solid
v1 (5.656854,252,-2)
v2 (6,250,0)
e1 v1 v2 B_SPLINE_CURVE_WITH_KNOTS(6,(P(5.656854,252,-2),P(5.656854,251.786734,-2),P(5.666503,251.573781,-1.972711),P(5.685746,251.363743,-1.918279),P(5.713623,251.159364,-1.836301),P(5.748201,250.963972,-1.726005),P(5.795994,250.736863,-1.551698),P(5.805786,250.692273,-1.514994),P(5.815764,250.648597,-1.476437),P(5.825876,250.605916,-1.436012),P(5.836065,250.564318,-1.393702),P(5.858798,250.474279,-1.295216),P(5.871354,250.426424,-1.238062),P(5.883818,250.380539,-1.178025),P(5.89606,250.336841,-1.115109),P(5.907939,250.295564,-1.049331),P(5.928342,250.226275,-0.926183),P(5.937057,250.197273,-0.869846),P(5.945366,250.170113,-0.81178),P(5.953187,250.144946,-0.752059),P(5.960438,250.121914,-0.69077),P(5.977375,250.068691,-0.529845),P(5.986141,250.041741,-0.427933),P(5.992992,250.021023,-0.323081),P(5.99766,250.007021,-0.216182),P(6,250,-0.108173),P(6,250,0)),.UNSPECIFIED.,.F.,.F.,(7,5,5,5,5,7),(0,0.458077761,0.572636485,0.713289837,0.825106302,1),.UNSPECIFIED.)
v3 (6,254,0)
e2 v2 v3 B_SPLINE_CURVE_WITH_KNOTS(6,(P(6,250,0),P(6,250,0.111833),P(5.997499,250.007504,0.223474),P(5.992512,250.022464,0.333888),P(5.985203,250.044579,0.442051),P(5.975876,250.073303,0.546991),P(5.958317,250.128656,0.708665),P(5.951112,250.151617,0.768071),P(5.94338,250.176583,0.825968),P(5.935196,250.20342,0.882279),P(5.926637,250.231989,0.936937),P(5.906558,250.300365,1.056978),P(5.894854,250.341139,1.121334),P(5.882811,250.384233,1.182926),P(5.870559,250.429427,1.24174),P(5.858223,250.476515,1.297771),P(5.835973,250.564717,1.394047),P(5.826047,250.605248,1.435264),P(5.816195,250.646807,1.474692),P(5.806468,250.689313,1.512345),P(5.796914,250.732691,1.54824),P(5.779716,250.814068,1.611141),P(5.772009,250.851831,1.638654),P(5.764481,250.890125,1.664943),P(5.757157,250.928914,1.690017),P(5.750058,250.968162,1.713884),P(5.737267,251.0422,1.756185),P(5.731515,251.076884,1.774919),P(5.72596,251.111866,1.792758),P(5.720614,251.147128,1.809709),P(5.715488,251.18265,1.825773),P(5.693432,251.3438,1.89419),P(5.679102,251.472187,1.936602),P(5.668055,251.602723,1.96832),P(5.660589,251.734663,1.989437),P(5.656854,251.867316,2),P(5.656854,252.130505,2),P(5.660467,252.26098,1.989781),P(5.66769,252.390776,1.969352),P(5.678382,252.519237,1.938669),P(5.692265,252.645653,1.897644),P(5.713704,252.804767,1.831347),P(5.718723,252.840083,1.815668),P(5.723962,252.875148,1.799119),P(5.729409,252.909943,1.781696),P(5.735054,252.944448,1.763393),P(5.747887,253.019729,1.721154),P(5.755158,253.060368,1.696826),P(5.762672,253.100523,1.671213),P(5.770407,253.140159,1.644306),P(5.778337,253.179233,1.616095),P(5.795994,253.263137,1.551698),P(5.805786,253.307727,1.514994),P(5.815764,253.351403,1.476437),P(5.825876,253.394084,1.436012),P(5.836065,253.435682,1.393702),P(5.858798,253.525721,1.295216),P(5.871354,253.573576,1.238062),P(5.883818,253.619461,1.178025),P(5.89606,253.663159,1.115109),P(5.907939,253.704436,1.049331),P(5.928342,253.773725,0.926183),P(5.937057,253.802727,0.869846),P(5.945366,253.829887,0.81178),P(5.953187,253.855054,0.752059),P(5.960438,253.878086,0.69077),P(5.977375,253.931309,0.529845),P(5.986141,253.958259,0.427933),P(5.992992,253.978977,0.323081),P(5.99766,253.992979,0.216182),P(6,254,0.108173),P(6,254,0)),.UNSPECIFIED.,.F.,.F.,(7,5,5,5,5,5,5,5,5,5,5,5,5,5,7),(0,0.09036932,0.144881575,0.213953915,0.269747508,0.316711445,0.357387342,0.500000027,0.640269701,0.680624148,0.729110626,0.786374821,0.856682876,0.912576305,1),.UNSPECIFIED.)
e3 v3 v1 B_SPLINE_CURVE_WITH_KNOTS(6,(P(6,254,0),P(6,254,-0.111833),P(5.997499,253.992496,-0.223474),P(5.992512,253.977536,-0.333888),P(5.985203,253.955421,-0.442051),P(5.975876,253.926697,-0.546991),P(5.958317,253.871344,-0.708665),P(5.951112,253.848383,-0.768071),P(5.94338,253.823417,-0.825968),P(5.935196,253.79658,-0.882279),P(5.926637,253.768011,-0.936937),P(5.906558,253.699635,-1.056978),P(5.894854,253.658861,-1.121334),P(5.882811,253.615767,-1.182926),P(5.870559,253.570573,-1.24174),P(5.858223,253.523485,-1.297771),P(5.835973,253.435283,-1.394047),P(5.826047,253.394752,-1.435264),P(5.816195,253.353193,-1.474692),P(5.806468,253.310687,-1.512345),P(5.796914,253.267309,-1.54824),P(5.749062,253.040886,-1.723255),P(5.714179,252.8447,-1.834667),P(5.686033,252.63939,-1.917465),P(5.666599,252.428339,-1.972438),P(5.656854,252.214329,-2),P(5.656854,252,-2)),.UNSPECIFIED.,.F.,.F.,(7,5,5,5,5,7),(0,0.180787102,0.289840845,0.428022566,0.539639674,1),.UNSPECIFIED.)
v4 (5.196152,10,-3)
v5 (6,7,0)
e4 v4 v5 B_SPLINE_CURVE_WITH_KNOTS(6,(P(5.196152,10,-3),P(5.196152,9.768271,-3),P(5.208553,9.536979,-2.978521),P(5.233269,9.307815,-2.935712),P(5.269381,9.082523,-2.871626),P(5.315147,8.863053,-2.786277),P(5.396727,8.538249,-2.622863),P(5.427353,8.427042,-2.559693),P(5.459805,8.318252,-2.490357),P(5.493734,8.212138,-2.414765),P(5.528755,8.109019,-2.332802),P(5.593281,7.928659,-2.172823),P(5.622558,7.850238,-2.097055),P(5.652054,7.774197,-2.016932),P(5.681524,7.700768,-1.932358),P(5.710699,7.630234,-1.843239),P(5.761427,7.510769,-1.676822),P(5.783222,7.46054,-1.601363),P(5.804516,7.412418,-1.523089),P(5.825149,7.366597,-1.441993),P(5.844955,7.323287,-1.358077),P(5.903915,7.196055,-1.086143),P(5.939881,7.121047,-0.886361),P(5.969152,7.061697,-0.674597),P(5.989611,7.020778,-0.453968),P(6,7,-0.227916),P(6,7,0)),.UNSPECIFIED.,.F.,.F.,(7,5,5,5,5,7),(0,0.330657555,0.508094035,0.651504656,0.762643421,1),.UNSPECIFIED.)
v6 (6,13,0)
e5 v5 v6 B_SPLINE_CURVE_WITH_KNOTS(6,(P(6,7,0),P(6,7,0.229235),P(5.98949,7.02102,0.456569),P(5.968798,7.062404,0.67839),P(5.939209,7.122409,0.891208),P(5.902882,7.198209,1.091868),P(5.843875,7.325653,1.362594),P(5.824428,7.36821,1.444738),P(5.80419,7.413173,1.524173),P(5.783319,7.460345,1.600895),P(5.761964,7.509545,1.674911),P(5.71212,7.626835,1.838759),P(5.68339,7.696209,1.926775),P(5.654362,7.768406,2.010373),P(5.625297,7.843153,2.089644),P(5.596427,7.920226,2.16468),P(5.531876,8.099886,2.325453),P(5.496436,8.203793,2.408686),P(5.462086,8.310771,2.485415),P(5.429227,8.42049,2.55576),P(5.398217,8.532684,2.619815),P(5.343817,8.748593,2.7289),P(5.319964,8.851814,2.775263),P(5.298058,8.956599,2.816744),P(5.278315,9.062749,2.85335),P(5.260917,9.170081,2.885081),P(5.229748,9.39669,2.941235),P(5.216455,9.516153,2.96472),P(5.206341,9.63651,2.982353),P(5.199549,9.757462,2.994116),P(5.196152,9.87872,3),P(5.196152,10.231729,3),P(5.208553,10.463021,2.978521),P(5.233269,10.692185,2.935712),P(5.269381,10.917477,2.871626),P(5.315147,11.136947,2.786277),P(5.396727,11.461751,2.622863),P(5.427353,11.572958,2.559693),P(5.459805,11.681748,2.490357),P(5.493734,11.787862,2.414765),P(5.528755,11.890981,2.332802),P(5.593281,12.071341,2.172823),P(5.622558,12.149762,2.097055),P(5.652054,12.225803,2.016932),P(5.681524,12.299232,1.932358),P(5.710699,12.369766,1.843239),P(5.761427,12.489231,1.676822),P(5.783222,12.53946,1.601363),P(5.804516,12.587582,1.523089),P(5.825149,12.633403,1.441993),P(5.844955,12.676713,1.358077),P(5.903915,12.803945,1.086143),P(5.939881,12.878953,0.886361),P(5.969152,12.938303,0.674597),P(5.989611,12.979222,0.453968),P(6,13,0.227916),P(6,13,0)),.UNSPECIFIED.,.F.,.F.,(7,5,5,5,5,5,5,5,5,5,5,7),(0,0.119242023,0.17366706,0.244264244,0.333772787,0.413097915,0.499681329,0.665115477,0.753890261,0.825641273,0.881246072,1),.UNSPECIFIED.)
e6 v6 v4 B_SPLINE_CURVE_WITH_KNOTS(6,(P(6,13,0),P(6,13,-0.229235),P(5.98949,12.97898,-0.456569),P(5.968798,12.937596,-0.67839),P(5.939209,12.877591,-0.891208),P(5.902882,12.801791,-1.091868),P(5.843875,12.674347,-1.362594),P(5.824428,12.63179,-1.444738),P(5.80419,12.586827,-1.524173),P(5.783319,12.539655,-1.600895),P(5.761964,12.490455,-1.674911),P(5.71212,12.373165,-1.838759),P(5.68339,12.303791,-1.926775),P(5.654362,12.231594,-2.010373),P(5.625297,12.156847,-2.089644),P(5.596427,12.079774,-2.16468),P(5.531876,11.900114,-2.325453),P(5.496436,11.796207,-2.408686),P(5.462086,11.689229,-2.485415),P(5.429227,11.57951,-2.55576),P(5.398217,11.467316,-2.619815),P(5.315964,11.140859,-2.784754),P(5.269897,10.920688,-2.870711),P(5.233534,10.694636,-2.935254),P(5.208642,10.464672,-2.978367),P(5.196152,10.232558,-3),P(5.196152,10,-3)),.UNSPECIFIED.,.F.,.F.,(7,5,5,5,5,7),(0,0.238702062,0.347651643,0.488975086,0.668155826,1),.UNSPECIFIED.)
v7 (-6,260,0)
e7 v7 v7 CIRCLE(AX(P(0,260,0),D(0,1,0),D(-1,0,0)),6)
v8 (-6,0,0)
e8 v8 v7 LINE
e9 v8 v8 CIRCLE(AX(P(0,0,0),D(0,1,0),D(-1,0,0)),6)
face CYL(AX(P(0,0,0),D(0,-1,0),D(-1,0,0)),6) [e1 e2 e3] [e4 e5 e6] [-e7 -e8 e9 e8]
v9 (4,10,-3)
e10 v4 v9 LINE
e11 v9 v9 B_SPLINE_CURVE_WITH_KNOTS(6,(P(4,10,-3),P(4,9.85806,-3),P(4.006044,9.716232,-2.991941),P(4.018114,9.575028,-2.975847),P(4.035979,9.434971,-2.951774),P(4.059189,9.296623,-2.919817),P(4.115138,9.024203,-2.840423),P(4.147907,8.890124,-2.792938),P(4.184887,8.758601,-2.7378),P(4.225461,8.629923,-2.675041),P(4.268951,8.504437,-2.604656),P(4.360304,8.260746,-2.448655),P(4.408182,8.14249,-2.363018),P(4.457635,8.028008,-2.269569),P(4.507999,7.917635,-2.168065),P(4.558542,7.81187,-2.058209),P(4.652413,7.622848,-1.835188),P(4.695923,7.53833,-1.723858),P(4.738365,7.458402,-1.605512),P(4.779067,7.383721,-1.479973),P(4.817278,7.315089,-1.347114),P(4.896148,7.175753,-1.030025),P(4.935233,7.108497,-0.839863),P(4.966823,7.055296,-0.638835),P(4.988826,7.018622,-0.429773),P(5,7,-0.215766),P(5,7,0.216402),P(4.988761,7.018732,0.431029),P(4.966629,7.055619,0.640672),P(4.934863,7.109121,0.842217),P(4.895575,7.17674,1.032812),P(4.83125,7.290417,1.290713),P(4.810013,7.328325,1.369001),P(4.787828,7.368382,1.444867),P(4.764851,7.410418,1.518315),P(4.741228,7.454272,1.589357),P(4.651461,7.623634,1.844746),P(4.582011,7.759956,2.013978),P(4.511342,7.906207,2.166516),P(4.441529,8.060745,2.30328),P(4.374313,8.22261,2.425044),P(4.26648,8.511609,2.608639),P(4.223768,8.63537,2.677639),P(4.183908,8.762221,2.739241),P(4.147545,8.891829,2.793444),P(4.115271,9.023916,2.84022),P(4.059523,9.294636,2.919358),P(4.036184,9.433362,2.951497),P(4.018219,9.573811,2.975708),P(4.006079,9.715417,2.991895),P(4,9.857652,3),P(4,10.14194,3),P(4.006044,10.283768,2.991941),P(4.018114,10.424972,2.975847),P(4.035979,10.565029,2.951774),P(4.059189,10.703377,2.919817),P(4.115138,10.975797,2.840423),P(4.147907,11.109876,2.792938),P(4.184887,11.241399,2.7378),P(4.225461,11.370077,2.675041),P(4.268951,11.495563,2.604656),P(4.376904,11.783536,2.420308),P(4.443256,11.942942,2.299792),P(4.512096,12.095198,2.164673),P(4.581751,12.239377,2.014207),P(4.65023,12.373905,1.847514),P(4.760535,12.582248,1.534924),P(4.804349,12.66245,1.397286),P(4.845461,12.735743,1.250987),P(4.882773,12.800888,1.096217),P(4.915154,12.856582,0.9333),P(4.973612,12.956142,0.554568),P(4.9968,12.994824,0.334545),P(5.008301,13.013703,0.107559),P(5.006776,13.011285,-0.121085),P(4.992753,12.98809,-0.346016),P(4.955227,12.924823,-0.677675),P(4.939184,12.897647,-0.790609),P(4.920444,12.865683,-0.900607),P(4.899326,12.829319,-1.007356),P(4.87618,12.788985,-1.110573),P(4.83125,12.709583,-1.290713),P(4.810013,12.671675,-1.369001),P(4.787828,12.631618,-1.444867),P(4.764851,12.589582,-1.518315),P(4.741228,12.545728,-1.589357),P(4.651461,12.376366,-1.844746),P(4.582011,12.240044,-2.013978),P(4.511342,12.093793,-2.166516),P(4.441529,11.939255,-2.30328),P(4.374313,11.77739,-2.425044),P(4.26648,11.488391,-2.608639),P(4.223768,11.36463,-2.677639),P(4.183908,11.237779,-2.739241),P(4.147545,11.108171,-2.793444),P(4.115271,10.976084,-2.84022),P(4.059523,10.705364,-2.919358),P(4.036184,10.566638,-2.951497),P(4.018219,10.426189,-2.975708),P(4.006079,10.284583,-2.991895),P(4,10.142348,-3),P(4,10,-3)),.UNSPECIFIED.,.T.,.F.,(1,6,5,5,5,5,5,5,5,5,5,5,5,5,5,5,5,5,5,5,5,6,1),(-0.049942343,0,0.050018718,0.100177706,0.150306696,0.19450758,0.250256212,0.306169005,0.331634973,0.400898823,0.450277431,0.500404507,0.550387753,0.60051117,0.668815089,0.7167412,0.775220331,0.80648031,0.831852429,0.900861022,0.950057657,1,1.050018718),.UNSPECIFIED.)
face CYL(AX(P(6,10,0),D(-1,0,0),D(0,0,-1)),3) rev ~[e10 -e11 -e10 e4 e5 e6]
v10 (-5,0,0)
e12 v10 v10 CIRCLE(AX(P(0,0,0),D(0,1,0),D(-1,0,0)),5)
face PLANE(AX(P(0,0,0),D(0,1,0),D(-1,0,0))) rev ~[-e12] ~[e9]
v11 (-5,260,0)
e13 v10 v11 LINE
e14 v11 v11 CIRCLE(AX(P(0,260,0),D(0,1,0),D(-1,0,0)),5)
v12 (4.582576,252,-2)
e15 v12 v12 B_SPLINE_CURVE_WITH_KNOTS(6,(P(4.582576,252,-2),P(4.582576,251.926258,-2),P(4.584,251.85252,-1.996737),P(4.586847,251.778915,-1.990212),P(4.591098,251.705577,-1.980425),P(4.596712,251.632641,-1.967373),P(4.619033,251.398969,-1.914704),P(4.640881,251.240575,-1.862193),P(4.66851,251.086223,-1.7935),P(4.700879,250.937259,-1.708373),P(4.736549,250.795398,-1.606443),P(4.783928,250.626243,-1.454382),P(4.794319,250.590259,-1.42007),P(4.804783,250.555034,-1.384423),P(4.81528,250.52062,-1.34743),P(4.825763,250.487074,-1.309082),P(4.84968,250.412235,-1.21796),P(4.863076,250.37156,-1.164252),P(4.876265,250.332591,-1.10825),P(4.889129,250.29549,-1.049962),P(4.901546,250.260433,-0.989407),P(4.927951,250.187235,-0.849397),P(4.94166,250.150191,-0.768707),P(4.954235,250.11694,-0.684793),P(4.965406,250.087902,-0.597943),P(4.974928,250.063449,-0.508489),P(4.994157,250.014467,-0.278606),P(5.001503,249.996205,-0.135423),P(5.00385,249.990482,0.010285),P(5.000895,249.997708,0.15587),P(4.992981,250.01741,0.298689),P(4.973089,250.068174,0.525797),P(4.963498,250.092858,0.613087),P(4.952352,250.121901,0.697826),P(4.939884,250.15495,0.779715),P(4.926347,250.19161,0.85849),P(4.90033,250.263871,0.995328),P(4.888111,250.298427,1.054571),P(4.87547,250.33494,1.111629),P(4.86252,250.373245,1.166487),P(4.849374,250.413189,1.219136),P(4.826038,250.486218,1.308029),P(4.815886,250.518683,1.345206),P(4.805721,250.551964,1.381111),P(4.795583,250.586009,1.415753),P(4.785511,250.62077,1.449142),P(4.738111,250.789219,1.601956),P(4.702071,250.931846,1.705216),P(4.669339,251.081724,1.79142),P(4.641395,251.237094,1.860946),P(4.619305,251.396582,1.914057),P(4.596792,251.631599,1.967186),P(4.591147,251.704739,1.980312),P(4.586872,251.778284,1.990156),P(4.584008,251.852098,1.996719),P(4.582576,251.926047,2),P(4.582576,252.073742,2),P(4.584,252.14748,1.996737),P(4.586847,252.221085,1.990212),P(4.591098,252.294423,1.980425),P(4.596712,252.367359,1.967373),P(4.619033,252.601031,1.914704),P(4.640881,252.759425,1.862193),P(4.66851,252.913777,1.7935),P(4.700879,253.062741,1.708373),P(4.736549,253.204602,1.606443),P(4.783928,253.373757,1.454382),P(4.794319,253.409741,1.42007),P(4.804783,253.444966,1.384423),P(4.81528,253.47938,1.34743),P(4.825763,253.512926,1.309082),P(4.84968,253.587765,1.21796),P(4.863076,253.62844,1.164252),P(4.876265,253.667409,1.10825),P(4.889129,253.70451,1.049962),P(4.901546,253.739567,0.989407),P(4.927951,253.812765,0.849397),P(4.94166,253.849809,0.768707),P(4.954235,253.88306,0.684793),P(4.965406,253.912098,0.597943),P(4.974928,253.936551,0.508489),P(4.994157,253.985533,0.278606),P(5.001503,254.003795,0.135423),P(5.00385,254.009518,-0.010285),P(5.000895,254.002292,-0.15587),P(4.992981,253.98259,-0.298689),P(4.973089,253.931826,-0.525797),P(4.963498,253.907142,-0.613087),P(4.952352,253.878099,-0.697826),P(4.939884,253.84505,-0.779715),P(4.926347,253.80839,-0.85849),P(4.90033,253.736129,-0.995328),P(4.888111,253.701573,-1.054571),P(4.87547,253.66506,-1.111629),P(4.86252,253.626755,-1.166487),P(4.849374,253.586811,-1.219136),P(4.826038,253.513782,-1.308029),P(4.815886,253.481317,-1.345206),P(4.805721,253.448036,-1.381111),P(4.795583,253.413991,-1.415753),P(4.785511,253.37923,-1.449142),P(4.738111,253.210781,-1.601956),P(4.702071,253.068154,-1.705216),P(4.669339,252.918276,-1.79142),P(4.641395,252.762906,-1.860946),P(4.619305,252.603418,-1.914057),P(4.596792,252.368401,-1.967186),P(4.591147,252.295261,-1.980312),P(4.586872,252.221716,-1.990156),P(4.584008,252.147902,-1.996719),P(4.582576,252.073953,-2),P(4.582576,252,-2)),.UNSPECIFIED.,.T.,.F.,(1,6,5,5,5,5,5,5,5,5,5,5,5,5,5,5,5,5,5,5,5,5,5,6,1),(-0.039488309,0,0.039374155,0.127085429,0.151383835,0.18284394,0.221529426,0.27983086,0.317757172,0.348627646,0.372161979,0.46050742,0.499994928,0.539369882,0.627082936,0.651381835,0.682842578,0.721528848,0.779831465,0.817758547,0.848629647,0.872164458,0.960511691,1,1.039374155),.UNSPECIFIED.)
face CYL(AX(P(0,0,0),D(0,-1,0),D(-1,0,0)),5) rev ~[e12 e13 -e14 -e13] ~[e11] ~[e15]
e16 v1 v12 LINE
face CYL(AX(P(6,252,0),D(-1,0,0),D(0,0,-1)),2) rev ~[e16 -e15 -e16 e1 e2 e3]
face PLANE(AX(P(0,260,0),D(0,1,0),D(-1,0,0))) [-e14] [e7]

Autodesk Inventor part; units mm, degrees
ref_plane "XZ Plane" through (0, 0, 0) normal (0, 1, 0) x (-1, 0, 0)
ref_plane "XY Plane" through (0, 0, 0) normal (0, 0, 1) x (1, 0, 0)
sketch "Sketch1" plane through (0, 0, 0) normal (0, 1, 0) x (-1, 0, 0)
  circle A0 centre (0, 0) radius 5
  circle A1 centre (0, 0) radius 6
  dimension "d0" = 12
  dimension "d1" = 1
extrude "Extrusion1" add sketch "Sketch1" along normal blind 260
ref_plane "Work Plane3" through (6, 0, 0) normal (1, 0, 0) x (0, 1, 0)
sketch "Sketch2" plane through (6, 0, 0) normal (1, 0, 0) x (0, 1, 0)
  line L0 (0, -6) -> (260, -6) projected
  line L1 (0, 6) -> (260, 6) projected
  line L2 (260, -6) -> (260, 6) projected
  line L3 (-60, 0) -> (360, 0) projected
  point P0 (0, 0)
  point P1 (10, 0)
  point P2 (252, 0)
  point P3 (260, 0)
  dimension "d20" = 10
  dimension "d21" = 8
hole "Hole1" at (6, 10, 0) direction (-1, 0, 0) diameter 6 end up to surface
hole "Hole2" at (6, 252, 0) direction (-1, 0, 0) diameter 4 end up to surface
equation "\"d2\" = pipe_length"
equation "\"pipe_length\" = -hinge_arm_length + hinge_insertion - 0.5 * box_diameter + 0.5 * stand_diameter - connection_length - margin_for_connection"
equation "\"stand_diameter\" = 800"
equation "\"hinge_insertion\" = 15"
equation "\"connection_length\" = 20"
equation "\"box_diameter\" = 200"
equation "\"hinge_arm_length\" = 25"
equation "\"margin_for_connection\" = 10"
properties part number "pipe" material "Aluminum 6061"
